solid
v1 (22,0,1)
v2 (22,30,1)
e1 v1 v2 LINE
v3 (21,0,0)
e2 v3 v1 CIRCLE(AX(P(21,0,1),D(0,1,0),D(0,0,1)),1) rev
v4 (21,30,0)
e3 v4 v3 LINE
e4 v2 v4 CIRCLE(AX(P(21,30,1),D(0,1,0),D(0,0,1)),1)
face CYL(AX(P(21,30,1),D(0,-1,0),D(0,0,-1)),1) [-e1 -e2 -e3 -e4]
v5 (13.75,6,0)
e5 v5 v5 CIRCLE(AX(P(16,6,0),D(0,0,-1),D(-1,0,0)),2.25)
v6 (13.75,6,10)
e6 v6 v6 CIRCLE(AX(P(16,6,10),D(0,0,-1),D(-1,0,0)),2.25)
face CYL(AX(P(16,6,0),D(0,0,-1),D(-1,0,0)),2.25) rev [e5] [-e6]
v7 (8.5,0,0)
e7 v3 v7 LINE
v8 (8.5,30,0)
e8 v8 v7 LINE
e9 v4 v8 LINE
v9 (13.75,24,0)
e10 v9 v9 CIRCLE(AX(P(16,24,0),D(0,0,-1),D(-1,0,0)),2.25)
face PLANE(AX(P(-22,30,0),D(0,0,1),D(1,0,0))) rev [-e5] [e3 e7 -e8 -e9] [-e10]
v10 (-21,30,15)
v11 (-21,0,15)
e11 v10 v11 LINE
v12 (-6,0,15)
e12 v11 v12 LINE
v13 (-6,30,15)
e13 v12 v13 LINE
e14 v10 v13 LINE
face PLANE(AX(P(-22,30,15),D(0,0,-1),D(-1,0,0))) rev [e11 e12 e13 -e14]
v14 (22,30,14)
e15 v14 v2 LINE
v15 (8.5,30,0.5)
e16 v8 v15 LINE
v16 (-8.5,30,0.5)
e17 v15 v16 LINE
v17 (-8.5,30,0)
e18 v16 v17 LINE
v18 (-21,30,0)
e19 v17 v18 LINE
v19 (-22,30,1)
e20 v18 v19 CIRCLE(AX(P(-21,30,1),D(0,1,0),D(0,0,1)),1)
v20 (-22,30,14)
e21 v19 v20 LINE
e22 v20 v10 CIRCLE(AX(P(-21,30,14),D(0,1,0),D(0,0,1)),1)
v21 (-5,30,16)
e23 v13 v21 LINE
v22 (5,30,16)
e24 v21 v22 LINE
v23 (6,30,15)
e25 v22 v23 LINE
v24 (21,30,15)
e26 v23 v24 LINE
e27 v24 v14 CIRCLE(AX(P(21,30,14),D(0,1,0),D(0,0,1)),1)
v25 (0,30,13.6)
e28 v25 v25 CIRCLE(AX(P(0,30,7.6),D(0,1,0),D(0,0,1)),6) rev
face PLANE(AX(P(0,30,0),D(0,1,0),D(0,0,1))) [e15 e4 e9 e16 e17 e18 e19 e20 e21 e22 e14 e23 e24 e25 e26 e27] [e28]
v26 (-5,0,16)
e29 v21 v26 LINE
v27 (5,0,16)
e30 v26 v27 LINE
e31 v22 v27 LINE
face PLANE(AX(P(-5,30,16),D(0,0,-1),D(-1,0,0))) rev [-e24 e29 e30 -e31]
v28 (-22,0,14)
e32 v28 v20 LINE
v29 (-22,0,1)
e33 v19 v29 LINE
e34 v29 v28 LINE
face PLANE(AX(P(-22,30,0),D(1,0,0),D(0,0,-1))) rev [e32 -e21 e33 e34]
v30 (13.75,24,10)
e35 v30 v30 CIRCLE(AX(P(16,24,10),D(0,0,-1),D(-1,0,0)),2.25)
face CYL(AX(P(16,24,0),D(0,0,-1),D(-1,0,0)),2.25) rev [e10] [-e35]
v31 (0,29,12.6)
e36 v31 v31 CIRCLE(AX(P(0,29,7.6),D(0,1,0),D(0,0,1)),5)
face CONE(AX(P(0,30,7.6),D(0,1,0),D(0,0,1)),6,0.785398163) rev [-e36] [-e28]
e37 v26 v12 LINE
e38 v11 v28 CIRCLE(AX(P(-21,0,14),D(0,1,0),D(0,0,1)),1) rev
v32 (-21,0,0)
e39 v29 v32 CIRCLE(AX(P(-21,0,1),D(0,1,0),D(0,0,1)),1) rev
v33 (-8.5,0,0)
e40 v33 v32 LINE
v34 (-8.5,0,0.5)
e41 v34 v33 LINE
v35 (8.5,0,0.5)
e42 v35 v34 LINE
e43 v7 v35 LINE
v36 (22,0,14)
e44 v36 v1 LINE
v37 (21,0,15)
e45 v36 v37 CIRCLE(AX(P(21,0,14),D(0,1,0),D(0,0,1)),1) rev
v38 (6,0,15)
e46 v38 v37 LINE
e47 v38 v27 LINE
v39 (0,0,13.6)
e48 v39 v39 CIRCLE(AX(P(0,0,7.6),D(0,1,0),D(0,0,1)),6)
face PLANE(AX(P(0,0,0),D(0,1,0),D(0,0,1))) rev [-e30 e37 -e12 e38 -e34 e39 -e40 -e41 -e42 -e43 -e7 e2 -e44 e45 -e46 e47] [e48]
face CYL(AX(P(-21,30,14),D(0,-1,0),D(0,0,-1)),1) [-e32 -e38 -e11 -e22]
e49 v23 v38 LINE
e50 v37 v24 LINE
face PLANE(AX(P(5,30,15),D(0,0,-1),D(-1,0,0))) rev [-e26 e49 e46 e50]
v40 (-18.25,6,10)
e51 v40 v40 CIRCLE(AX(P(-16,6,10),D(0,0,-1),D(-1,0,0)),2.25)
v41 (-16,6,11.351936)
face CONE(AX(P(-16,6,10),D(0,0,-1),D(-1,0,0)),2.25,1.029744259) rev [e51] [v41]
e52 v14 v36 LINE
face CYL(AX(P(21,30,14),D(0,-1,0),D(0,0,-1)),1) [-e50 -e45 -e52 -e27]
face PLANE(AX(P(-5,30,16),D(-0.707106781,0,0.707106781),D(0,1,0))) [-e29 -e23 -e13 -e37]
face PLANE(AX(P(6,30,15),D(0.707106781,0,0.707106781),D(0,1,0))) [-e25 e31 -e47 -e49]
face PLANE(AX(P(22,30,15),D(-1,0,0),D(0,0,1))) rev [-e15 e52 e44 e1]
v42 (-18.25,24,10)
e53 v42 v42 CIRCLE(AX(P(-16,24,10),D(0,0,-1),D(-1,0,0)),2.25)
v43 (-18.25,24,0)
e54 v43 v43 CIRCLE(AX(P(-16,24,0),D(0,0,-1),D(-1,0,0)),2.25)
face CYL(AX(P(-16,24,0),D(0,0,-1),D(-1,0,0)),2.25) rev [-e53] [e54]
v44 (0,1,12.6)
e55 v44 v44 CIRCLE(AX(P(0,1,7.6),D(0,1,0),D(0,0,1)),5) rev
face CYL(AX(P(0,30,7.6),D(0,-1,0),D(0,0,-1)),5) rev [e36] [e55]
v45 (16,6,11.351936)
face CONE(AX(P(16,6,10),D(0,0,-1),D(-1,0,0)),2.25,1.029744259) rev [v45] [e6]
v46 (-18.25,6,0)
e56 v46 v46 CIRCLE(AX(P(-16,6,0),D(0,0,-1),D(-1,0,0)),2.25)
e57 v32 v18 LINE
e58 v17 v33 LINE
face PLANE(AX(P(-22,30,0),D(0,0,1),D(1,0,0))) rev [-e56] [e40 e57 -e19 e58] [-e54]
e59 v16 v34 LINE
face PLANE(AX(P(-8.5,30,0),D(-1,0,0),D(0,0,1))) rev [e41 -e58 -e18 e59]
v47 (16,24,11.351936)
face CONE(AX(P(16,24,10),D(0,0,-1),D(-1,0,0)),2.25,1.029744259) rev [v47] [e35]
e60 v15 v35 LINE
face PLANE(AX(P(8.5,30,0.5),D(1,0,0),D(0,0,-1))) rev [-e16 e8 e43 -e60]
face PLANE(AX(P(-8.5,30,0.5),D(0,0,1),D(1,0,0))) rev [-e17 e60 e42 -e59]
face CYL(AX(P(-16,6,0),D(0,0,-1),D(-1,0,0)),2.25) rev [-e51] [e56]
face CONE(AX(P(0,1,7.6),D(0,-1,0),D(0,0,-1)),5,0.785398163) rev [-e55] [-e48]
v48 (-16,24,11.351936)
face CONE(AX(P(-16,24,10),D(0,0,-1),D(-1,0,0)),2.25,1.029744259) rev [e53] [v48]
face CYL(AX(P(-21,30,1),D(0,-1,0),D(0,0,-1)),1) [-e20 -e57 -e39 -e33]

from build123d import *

# Parameters (mm, degrees)
EXTRUDE_1_DEPTH     = 30
SKETCH_2_R          = 5
CUT_EXTRUDE_1_DEPTH = 30
M5X0_5_1_D          = 4.5
M5X0_5_1_DEPTH      = 10
M5X0_5_1_TIP        = 1.351936393
SKETCH_7_W          = 17
SKETCH_7_H          = 0.5
CUT_EXTRUDE_2_DEPTH = 41.496913463
CHAMFER_1_SIZE      = 1
FILLET_1_R          = 1


with BuildPart() as part:
    # 草图1 → 凸台-拉伸1 (new body)
    with BuildSketch(Plane(origin=(0, 0, 0), x_dir=(1, 0, 0), z_dir=(0, 1, 0))):
        Polygon((-22, 0), (22, 0), (22, -15), (5, -15), (5, -16), (-5, -16), (-5, -15), (-22, -15), align=None)
    extrude(amount=EXTRUDE_1_DEPTH)

    # 草图2 → 切除-拉伸1 (cut)
    with BuildSketch(Plane.XZ):
        with Locations(Location((0, 7.6, 0), (0, 0, 270))):
            Circle(SKETCH_2_R)
    extrude(amount=-CUT_EXTRUDE_1_DEPTH, mode=Mode.SUBTRACT)

    # M5X0.5 螺纹孔的螺纹孔钻头1
    with Locations(Plane(origin=(0, 0, 0), x_dir=(-1, 0, 0), z_dir=(0, 0, -1))):
        with Locations((-16, 24), (16, 24), (16, 6), (-16, 6)):
            Hole(M5X0_5_1_D / 2, depth=M5X0_5_1_DEPTH)
            with Locations((0, 0, -(M5X0_5_1_DEPTH + M5X0_5_1_TIP / 2))):  # 118° drill point
                Cone(0, M5X0_5_1_D / 2, M5X0_5_1_TIP, mode=Mode.SUBTRACT)

    # 草图7 → 切除-拉伸2 (cut, through all)
    with BuildSketch(Plane.XZ):
        with Locations((0, 0.25)):
            Rectangle(SKETCH_7_W, SKETCH_7_H)
    extrude(amount=-CUT_EXTRUDE_2_DEPTH, mode=Mode.SUBTRACT)

    # 倒角1
    chamfer_1_edges = [part.edges().sort_by_distance(p)[0] for p in [
        (-5, 15, 15),
        (5, 15, 15),
        (0, 30, 12.6),
        (0, 0, 12.6),
    ]]
    chamfer(chamfer_1_edges, length=CHAMFER_1_SIZE - 0.0001)  # a hair under: the kernel refuses the full size

    # 圆角1
    fillet_1_edges = [part.edges().sort_by_distance(p)[0] for p in [
        (-22, 15, 15),
        (-22, 15, 0),
        (22, 15, 0),
        (22, 15, 15),
    ]]
    fillet(fillet_1_edges, radius=FILLET_1_R)


solid = part.part
